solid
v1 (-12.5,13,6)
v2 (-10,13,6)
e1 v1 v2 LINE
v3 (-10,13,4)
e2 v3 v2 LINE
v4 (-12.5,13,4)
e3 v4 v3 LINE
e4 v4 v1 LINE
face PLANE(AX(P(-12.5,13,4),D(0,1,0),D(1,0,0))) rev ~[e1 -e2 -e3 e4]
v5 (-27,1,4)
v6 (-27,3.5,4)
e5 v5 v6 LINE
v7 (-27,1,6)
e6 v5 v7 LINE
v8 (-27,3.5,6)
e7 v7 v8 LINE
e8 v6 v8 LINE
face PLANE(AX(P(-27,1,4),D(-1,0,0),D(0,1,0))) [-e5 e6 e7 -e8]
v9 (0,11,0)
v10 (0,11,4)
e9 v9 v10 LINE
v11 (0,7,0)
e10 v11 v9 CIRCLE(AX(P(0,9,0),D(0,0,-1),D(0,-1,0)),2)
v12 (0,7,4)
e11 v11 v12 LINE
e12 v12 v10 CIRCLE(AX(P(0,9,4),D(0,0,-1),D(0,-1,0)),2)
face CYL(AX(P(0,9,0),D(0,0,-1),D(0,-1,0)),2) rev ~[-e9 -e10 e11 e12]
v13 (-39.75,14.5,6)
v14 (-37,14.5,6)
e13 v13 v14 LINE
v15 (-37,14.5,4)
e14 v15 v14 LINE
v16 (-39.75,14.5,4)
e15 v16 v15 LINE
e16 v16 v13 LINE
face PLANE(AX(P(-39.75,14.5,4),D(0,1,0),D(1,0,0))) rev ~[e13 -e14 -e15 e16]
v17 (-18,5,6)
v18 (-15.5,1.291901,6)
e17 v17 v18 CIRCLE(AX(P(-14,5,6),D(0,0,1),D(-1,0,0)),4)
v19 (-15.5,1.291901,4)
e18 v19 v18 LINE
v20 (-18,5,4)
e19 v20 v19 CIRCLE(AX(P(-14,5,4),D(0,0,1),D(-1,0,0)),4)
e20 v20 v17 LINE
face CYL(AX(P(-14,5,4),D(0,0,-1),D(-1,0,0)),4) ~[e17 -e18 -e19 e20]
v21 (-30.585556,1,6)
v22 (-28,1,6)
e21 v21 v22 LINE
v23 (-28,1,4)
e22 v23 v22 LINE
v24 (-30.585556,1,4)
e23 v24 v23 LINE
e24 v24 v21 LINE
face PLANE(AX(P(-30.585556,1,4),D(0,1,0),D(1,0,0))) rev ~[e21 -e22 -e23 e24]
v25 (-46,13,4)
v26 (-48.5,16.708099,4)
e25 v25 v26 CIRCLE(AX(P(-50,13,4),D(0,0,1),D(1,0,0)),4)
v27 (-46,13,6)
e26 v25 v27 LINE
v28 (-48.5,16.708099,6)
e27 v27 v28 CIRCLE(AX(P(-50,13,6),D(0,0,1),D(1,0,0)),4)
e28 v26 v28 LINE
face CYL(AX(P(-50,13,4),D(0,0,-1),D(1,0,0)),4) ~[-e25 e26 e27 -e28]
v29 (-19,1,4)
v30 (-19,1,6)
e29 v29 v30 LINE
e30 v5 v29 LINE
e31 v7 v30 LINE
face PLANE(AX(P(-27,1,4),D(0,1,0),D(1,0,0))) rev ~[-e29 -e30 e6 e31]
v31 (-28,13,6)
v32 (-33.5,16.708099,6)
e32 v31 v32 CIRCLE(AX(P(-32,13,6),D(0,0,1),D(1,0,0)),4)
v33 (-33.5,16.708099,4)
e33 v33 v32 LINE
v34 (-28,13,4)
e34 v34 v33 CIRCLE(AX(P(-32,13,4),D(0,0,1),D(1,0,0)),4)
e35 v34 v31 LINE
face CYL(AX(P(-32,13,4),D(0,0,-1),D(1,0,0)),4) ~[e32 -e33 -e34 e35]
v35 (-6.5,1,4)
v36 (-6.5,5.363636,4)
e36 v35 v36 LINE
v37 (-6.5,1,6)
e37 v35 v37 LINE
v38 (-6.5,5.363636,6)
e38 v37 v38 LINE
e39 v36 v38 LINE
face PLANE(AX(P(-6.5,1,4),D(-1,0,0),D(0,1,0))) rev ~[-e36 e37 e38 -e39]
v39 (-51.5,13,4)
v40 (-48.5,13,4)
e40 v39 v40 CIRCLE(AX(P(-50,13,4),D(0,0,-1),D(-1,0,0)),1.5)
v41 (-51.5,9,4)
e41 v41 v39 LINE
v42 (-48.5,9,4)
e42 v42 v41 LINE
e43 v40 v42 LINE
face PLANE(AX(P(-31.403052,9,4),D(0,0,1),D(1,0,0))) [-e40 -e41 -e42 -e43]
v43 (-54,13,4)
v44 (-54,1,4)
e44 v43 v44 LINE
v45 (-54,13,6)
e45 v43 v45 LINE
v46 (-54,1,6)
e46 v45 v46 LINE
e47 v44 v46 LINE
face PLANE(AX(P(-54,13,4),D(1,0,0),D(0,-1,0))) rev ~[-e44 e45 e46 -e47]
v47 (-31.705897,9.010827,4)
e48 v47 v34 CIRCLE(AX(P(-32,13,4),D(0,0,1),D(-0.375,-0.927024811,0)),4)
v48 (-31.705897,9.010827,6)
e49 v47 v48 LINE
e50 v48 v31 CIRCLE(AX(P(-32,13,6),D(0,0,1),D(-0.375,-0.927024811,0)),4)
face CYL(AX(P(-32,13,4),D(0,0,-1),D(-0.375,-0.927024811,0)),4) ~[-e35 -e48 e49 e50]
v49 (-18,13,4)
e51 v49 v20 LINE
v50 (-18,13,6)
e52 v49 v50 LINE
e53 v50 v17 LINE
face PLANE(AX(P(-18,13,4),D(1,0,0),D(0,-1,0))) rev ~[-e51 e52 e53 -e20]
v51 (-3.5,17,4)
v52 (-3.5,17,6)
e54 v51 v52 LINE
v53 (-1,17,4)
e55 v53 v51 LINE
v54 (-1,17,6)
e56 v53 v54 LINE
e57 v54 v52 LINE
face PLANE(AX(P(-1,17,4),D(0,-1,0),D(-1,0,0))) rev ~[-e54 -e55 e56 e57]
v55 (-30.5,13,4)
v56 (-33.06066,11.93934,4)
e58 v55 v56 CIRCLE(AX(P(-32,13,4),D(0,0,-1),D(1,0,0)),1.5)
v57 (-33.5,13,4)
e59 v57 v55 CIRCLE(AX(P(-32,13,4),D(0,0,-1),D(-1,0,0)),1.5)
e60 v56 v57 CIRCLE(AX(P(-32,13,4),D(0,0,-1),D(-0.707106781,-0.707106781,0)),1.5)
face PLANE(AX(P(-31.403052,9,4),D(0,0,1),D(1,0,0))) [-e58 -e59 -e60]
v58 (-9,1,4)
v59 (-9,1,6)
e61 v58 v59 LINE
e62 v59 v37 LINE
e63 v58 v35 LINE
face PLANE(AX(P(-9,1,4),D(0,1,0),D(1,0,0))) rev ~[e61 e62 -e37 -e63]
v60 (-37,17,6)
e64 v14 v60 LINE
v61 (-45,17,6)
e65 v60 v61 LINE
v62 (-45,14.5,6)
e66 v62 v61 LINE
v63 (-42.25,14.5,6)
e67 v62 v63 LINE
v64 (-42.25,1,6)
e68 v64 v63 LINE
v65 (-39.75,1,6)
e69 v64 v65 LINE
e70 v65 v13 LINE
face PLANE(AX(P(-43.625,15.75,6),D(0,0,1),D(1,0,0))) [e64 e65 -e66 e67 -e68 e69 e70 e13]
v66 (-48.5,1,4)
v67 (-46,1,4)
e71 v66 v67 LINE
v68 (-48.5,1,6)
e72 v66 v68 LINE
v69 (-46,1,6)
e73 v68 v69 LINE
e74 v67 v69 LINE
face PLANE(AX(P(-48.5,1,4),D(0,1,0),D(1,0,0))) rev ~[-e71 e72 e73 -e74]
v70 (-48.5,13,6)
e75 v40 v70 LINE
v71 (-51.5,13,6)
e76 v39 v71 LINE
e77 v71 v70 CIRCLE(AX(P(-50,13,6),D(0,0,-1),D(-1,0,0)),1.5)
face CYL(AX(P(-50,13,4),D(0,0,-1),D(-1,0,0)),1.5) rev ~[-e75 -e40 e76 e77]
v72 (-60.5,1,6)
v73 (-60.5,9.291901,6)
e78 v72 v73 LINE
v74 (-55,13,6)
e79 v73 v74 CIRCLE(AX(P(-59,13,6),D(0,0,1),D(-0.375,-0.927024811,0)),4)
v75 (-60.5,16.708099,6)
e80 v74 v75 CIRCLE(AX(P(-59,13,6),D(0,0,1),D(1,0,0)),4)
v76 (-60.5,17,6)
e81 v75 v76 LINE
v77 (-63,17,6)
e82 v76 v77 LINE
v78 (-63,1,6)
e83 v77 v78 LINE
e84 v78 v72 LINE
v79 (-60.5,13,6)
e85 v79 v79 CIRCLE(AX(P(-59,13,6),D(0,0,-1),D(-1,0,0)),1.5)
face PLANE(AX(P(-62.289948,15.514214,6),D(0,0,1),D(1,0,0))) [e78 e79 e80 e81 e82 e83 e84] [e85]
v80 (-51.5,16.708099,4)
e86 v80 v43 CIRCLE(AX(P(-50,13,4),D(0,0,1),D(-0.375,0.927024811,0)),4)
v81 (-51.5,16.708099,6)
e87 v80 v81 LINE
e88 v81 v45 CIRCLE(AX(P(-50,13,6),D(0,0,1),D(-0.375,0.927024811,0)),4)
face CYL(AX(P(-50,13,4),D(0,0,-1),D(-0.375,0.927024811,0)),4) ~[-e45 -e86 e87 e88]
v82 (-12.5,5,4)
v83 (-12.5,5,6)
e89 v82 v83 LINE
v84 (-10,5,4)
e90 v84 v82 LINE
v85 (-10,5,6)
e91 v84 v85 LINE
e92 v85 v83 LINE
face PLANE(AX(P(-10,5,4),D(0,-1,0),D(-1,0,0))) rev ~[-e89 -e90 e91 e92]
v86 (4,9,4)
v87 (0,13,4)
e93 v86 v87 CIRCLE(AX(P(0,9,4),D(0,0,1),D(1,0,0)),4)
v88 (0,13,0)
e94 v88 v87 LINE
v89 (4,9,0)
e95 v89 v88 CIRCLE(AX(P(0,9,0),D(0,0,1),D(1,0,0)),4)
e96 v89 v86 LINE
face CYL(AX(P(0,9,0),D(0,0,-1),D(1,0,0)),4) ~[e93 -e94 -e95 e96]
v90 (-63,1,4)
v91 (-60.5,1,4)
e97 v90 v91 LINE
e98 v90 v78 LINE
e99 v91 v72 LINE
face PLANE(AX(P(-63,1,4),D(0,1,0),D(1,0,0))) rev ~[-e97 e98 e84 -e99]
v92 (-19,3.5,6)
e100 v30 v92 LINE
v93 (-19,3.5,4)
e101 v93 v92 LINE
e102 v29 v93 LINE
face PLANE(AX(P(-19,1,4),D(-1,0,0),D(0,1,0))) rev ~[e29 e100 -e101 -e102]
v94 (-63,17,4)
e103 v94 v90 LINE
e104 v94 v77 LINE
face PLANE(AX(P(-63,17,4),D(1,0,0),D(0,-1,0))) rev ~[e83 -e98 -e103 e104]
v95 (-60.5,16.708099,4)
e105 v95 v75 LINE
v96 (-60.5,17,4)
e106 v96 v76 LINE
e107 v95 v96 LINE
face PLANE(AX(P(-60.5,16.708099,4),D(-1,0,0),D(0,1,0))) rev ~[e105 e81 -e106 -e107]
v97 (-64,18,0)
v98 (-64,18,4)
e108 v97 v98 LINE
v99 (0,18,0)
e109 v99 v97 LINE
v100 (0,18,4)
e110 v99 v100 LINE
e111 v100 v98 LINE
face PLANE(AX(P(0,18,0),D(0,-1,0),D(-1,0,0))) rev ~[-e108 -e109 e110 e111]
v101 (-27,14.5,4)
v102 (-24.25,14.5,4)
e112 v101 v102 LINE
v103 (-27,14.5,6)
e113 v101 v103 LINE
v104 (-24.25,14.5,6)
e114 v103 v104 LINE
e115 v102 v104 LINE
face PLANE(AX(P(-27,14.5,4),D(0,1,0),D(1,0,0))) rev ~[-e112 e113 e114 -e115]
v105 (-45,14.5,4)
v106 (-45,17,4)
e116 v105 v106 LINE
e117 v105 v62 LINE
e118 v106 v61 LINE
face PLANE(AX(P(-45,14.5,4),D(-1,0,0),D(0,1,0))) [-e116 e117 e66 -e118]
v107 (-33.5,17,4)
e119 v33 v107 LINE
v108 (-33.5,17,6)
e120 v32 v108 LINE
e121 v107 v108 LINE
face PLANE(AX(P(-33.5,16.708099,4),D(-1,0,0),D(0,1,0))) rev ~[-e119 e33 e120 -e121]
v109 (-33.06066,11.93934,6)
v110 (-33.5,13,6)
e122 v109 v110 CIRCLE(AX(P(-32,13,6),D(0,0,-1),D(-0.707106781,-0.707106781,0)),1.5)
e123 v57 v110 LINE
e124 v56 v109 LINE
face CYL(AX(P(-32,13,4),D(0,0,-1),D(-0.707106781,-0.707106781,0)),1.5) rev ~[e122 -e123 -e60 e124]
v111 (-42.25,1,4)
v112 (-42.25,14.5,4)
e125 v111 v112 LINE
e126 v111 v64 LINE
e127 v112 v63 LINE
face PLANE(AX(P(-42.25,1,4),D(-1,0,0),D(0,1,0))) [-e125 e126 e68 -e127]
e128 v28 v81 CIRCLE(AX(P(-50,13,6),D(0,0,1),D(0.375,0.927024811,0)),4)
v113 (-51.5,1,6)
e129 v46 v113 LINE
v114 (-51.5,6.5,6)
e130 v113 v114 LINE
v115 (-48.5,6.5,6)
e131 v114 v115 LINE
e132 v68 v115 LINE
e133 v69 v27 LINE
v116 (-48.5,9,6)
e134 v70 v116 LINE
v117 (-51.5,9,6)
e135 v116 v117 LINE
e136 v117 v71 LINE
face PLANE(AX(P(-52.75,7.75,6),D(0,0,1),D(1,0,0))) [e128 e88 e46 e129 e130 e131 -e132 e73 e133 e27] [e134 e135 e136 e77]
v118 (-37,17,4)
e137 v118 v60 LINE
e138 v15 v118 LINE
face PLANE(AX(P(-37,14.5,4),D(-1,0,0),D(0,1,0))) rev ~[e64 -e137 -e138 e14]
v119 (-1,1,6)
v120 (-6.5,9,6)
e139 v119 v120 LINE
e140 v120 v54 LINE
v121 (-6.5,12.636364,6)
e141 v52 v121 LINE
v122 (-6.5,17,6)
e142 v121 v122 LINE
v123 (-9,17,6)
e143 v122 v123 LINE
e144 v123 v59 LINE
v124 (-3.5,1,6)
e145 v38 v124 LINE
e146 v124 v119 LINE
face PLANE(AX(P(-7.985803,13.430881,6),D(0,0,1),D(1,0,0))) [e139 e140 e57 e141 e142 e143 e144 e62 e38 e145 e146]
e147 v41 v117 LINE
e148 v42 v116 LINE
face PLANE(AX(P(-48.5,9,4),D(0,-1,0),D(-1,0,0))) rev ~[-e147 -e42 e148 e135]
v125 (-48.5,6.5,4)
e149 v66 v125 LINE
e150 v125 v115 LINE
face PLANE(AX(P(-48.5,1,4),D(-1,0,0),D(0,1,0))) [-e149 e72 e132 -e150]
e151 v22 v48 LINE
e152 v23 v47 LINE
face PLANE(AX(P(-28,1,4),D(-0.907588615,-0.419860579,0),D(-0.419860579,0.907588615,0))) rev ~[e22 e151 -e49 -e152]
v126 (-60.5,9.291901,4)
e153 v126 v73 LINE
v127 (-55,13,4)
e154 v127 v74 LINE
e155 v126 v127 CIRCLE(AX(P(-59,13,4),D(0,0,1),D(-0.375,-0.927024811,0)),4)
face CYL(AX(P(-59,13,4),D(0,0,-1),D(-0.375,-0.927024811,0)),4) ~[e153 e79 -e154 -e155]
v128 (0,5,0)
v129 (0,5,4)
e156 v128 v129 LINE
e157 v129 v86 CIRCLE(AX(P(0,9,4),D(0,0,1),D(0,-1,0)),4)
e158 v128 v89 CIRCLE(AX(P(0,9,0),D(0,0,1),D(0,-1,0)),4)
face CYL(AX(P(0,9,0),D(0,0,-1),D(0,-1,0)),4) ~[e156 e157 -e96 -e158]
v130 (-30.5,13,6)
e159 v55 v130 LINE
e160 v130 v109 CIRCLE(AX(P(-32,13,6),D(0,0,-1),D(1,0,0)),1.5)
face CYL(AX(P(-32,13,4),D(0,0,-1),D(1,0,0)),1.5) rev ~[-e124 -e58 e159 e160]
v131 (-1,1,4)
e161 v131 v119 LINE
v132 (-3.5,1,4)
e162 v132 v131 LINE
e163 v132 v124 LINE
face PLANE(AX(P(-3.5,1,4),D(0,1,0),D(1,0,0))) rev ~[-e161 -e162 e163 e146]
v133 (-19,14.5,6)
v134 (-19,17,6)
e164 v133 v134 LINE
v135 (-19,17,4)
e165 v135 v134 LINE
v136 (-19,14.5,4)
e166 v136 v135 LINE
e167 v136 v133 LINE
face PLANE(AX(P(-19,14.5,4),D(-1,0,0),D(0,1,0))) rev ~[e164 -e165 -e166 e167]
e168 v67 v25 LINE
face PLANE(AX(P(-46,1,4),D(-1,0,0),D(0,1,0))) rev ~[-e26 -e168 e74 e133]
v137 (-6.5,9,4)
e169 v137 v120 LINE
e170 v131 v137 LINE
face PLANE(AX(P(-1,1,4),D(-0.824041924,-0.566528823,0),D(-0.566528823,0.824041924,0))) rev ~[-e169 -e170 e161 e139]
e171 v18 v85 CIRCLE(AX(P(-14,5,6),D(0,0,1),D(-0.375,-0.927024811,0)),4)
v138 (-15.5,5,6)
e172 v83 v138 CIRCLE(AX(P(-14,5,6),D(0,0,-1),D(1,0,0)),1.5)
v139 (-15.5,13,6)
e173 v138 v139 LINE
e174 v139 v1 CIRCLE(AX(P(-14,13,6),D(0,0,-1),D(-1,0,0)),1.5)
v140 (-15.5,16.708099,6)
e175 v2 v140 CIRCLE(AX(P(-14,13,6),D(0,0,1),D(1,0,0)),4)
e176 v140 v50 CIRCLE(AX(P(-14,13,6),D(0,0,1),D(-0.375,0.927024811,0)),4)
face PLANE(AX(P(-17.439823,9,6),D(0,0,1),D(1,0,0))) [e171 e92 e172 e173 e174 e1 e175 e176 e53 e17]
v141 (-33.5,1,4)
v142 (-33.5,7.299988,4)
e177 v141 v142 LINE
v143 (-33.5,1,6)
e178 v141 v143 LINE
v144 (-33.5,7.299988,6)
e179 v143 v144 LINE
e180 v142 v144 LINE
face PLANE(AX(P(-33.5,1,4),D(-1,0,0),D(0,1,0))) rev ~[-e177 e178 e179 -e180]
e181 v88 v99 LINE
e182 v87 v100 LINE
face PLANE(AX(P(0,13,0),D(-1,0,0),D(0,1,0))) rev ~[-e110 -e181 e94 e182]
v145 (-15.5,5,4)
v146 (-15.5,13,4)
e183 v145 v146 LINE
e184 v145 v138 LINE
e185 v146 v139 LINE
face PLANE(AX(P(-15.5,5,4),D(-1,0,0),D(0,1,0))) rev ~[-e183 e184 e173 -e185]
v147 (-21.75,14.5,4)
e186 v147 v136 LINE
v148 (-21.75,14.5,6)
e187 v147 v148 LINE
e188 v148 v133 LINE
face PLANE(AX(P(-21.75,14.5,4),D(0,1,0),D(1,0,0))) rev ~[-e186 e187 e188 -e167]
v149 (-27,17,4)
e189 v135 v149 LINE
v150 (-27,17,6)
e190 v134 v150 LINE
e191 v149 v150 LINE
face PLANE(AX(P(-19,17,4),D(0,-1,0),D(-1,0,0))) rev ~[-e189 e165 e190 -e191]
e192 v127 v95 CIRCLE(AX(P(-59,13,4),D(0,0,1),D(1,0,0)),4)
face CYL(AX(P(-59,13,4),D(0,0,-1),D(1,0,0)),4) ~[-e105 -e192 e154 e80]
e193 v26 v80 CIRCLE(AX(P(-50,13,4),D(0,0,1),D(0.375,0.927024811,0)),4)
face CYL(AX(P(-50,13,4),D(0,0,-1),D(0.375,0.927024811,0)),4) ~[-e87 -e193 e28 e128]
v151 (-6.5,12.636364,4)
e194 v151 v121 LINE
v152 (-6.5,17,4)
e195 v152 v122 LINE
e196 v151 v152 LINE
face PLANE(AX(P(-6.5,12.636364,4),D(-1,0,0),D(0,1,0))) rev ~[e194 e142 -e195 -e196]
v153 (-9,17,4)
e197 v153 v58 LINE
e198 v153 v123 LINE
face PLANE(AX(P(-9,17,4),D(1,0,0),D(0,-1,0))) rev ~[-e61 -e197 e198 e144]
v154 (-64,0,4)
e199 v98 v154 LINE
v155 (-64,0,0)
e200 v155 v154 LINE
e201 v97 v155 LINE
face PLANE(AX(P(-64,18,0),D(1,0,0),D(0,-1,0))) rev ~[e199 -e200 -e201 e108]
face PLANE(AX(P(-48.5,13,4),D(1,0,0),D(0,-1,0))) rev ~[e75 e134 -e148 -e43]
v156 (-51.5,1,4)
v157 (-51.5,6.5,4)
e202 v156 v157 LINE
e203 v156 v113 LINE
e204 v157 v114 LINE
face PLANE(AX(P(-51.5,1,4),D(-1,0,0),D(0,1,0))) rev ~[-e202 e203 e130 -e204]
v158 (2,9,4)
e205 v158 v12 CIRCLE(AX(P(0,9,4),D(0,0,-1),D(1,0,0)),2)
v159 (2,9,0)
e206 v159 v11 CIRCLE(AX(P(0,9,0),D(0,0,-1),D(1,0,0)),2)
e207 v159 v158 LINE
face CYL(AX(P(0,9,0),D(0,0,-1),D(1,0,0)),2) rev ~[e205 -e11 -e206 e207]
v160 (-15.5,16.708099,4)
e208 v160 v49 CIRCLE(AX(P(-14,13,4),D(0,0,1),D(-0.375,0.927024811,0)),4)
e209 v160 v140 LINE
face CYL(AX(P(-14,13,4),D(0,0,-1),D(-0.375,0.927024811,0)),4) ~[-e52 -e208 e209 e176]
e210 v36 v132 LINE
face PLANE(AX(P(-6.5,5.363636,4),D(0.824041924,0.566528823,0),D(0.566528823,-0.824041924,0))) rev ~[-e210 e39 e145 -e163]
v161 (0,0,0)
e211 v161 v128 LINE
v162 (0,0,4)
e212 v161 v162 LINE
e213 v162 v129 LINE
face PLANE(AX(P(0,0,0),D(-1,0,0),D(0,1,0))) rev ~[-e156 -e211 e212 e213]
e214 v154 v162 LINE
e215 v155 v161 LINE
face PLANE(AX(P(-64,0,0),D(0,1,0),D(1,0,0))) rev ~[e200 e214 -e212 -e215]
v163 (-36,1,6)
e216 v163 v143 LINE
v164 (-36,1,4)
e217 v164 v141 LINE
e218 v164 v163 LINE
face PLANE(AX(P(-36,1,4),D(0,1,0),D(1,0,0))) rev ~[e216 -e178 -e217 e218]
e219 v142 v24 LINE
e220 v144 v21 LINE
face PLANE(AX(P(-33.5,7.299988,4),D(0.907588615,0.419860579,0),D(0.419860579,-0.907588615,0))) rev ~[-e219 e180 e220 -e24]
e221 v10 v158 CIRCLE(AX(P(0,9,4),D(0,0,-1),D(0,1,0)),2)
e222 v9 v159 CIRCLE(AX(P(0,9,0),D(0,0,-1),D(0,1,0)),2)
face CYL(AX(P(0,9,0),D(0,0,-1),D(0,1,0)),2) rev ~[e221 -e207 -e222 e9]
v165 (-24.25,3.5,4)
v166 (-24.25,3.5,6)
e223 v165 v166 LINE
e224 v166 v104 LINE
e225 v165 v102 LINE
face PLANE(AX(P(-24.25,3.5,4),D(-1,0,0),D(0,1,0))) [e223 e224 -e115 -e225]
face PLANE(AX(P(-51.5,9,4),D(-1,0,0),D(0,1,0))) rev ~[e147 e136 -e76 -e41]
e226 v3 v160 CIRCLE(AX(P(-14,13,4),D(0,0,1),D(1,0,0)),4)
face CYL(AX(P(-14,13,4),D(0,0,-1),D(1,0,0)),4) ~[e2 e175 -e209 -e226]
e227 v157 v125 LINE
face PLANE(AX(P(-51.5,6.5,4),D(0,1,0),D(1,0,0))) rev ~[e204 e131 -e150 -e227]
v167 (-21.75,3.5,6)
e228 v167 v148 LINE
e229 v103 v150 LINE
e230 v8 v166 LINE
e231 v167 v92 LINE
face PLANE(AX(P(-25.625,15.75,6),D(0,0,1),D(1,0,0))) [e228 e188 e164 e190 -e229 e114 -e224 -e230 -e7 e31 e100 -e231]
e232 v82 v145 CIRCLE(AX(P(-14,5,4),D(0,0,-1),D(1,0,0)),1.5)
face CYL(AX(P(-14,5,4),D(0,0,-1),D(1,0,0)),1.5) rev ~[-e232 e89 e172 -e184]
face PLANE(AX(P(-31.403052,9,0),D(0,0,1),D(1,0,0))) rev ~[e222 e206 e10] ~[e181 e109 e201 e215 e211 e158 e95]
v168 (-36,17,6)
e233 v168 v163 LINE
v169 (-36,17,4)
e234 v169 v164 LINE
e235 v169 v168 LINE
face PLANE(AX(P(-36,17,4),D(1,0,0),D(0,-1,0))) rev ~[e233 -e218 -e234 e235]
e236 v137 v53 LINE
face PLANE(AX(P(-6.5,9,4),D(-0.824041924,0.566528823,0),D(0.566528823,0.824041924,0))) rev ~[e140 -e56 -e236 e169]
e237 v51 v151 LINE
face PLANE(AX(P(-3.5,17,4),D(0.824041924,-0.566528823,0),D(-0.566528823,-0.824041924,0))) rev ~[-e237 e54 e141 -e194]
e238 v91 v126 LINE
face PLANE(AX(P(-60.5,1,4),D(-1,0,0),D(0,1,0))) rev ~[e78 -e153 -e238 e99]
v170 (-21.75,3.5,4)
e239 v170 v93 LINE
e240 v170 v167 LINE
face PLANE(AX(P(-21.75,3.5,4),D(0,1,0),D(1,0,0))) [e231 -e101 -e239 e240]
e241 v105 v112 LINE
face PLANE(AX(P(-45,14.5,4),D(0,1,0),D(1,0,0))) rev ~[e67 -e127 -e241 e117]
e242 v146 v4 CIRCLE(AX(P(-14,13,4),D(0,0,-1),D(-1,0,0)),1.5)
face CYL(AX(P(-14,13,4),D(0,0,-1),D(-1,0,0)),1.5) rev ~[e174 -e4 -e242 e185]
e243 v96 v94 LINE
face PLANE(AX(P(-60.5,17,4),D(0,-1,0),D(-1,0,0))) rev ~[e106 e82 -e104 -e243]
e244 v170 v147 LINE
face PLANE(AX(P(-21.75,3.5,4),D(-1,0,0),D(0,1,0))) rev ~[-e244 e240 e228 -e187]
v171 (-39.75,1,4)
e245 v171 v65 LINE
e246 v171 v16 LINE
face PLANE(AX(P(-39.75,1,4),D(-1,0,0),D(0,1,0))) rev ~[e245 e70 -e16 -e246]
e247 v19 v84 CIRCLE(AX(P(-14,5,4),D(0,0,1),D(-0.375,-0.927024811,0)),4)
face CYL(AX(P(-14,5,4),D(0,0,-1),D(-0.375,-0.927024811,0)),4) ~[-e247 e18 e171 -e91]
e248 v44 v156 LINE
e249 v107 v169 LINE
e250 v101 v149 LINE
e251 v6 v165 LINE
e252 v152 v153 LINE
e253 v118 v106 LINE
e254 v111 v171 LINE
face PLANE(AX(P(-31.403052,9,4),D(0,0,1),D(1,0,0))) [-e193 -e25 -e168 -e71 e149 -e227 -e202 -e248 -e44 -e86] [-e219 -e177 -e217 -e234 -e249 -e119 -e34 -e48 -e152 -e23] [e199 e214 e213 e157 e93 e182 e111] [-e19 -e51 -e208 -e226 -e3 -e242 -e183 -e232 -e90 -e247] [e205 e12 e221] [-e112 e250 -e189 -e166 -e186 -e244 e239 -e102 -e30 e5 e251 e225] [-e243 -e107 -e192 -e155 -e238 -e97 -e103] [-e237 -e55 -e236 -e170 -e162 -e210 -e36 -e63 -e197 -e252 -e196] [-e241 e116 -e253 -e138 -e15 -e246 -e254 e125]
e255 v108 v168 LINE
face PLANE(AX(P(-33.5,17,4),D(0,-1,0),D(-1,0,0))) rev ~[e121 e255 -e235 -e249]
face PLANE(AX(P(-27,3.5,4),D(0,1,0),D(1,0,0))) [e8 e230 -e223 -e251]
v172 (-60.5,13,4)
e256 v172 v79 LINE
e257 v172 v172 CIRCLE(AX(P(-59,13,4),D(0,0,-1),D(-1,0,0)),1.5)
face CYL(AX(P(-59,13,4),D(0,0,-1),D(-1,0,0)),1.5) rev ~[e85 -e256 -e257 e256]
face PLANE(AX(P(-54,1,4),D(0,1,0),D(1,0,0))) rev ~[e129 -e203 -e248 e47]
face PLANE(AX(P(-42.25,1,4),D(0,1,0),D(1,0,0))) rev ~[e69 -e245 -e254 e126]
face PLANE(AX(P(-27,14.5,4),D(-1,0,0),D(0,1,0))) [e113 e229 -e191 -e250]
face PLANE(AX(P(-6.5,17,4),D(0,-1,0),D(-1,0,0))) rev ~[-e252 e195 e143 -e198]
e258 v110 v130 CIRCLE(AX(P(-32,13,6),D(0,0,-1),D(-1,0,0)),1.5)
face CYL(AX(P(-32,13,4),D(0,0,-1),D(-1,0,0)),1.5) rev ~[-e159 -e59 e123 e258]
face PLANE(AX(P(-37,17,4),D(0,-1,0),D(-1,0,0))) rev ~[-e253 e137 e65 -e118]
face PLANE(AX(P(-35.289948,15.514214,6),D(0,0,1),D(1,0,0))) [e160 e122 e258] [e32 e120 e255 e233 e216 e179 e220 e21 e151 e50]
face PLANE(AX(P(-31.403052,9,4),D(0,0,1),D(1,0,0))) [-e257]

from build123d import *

# Parameters (mm, degrees)
F1_DEPTH = 4
F2_W     = 2.5
F2_H     = 2.5
F2_H_2   = 5.5
F2_W_2   = 2.75
F2_H_3   = 13.5
F2_H_4   = 11
F3_DEPTH = 2


with BuildPart() as f1:
    # F0 (on Top) → F1 (new body)
    with BuildSketch(Plane.XY):
        with BuildLine():
            Line((-64, 0), (0, 0))
            Line((0, 0), (0, 5))
            ThreePointArc((0, 5), (-4, 9), (0, 13))
            Line((0, 13), (0, 18))
            Line((0, 18), (-64, 18))
            Line((-64, 18), (-64, 0))
        make_face()
        with BuildLine():
            ThreePointArc((0, 13), (-4, 9), (0, 5))
            Line((0, 5), (0, 7))
            ThreePointArc((0, 7), (-2, 9), (0, 11))
            Line((0, 11), (0, 13))
        make_face()
        with BuildLine():
            Line((0, 7), (0, 5))
            ThreePointArc((0, 5), (2.8284271247, 6.1715728753), (4, 9))
            ThreePointArc((4, 9), (2.8284271247, 11.8284271247), (0, 13))
            Line((0, 13), (0, 11))
            ThreePointArc((0, 11), (1.4142135624, 10.4142135624), (2, 9))
            ThreePointArc((2, 9), (1.4142135624, 7.5857864376), (0, 7))
        make_face()
    extrude(amount=F1_DEPTH)

    # F2 (on face) → F3 (join)
    with BuildSketch(Plane.XY.offset(4)):
        with BuildLine():
            Line((-60.5, 17), (-63, 17))
            Line((-63, 17), (-63, 13))
            ThreePointArc((-63, 13), (-62.3166247904, 15.2360679775), (-60.5, 16.7080992435))
            Line((-60.5, 16.7080992435), (-60.5, 17))
        make_face()
        with BuildLine():
            ThreePointArc((-60.5, 9.2919007565), (-62.3166247904, 10.7639320225), (-63, 13))
            Line((-63, 13), (-63, 1))
            Line((-63, 1), (-60.5, 1))
            Line((-60.5, 1), (-60.5, 9.2919007565))
        make_face()
        with BuildLine():
            ThreePointArc((-60.5, 16.7080992435), (-62.3166247904, 15.2360679775), (-63, 13))
            ThreePointArc((-63, 13), (-62.3166247904, 10.7639320225), (-60.5, 9.2919007565))
            Line((-60.5, 9.2919007565), (-60.5, 13))
            Line((-60.5, 13), (-60.5, 16.7080992435))
        make_face()
        with BuildLine():
            ThreePointArc((-55, 13), (-56.7639320225, 16.3166247904), (-60.5, 16.7080992435))
            Line((-60.5, 16.7080992435), (-60.5, 13))
            Line((-60.5, 13), (-60.5, 9.2919007565))
            ThreePointArc((-60.5, 9.2919007565), (-56.7639320225, 9.6833752096), (-55, 13))
        make_face()
        with BuildLine():
            ThreePointArc((-57.5, 13), (-59, 11.5), (-60.5, 13))
            ThreePointArc((-60.5, 13), (-59, 14.5), (-57.5, 13))
        make_face(mode=Mode.SUBTRACT)
        with Locations((-52.75, 7.75)):
            Rectangle(F2_W, F2_H)
        with BuildLine():
            Line((-54, 13), (-54, 9))
            Line((-54, 9), (-51.5, 9))
            Line((-51.5, 9), (-51.5, 9.2919007565))
            ThreePointArc((-51.5, 9.2919007565), (-53.3166247904, 10.7639320225), (-54, 13))
        make_face()
        with Locations((-52.75, 3.75)):
            Rectangle(F2_W, F2_H_2)
        with BuildLine():
            ThreePointArc((-51.5, 16.7080992435), (-53.3166247904, 15.2360679775), (-54, 13))
            ThreePointArc((-54, 13), (-53.3166247904, 10.7639320225), (-51.5, 9.2919007565))
            Line((-51.5, 9.2919007565), (-51.5, 13))
            Line((-51.5, 13), (-51.5, 16.7080992435))
        make_face()
        Polygon((-50, 9), (-51.5, 9), (-51.5, 6.5), (-48.5, 6.5), (-48.5, 9), align=None)
        with BuildLine():
            ThreePointArc((-48.5, 16.7080992435), (-50, 17), (-51.5, 16.7080992435))
            Line((-51.5, 16.7080992435), (-51.5, 13))
            ThreePointArc((-51.5, 13), (-50, 14.5), (-48.5, 13))
            Line((-48.5, 13), (-48.5, 16.7080992435))
        make_face()
        with Locations((-47.25, 3.75)):
            Rectangle(F2_W, F2_H_2)
        with Locations((-47.25, 7.75)):
            Rectangle(F2_W, F2_H)
        with BuildLine():
            ThreePointArc((-46, 13), (-46.6833752096, 15.2360679775), (-48.5, 16.7080992435))
            Line((-48.5, 16.7080992435), (-48.5, 13))
            Line((-48.5, 13), (-48.5, 9.2919007565))
            ThreePointArc((-48.5, 9.2919007565), (-46.6833752096, 10.7639320225), (-46, 13))
        make_face()
        with BuildLine():
            Line((-48.5, 9.2919007565), (-48.5, 9))
            Line((-48.5, 9), (-46, 9))
            Line((-46, 9), (-46, 13))
            ThreePointArc((-46, 13), (-46.6833752096, 10.7639320225), (-48.5, 9.2919007565))
        make_face()
        with Locations((-43.625, 15.75)):
            Rectangle(F2_W_2, F2_H)
        with Locations((-41, 15.75)):
            Rectangle(F2_W, F2_H)
        with Locations((-38.375, 15.75)):
            Rectangle(F2_W_2, F2_H)
        with Locations((-41, 7.75)):
            Rectangle(F2_W, F2_H_3)
        with BuildLine():
            Line((-33.5, 17), (-36, 17))
            Line((-36, 17), (-36, 13))
            ThreePointArc((-36, 13), (-35.3166247904, 15.2360679775), (-33.5, 16.7080992435))
            Line((-33.5, 16.7080992435), (-33.5, 17))
        make_face()
        with BuildLine():
            ThreePointArc((-34.8284271247, 10.1715728753), (-35.69551813, 11.4692662705), (-36, 13))
            Line((-36, 13), (-36, 1))
            Line((-36, 1), (-33.5, 1))
            Line((-33.5, 1), (-33.5, 7.299987892))
            Line((-33.5, 7.299987892), (-34.8284271247, 10.1715728753))
        make_face()
        with BuildLine():
            ThreePointArc((-33.5, 16.7080992435), (-35.3166247904, 15.2360679775), (-36, 13))
            ThreePointArc((-36, 13), (-35.69551813, 11.4692662705), (-34.8284271247, 10.1715728753))
            ThreePointArc((-34.8284271247, 10.1715728753), (-34.2084555922, 9.6649252036), (-33.5, 9.2919007565))
            Line((-33.5, 9.2919007565), (-33.5, 13))
            Line((-33.5, 13), (-33.5, 16.7080992435))
        make_face()
        with BuildLine():
            ThreePointArc((-28, 13), (-29.7639320225, 16.3166247904), (-33.5, 16.7080992435))
            Line((-33.5, 16.7080992435), (-33.5, 13))
            ThreePointArc((-33.5, 13), (-32, 14.5), (-30.5, 13))
            ThreePointArc((-30.5, 13), (-31.4259748515, 11.6141807012), (-33.0606601718, 11.9393398282))
            Line((-33.0606601718, 11.9393398282), (-31.7058974503, 9.0108266909))
            ThreePointArc((-31.7058974503, 9.0108266909), (-29.0694360441, 10.2775388156), (-28, 13))
        make_face()
        with BuildLine():
            ThreePointArc((-33.5, 9.2919007565), (-34.2084555922, 9.6649252036), (-34.8284271247, 10.1715728753))
            Line((-34.8284271247, 10.1715728753), (-33.5, 7.299987892))
            Line((-33.5, 7.299987892), (-33.5, 9.2919007565))
        make_face()
        with BuildLine():
            ThreePointArc((-33.0606601718, 11.9393398282), (-33.3858192988, 12.4259748515), (-33.5, 13))
            Line((-33.5, 13), (-33.5, 9.2919007565))
            ThreePointArc((-33.5, 9.2919007565), (-32.6191105093, 9.048202665), (-31.7058974503, 9.0108266909))
            Line((-31.7058974503, 9.0108266909), (-33.0606601718, 11.9393398282))
        make_face()
        with BuildLine():
            ThreePointArc((-31.7058974503, 9.0108266909), (-32.6191105093, 9.048202665), (-33.5, 9.2919007565))
            Line((-33.5, 9.2919007565), (-33.5, 7.299987892))
            Line((-33.5, 7.299987892), (-30.5855555903, 1))
            Line((-30.5855555903, 1), (-28, 1))
            Line((-28, 1), (-31.7058974503, 9.0108266909))
        make_face()
        with Locations((-25.625, 15.75)):
            Rectangle(F2_W_2, F2_H)
        with Locations((-23, 15.75)):
            Rectangle(F2_W, F2_H)
        with Locations((-20.375, 15.75)):
            Rectangle(F2_W_2, F2_H)
        with Locations((-23, 9)):
            Rectangle(F2_W, F2_H_4)
        with Locations((-25.625, 2.25)):
            Rectangle(F2_W_2, F2_H)
        with Locations((-23, 2.25)):
            Rectangle(F2_W, F2_H)
        with Locations((-20.375, 2.25)):
            Rectangle(F2_W_2, F2_H)
        with BuildLine():
            ThreePointArc((-15.5, 9.2919007565), (-17.3166247904, 10.7639320225), (-18, 13))
            Line((-18, 13), (-18, 5))
            ThreePointArc((-18, 5), (-17.3166247904, 7.2360679775), (-15.5, 8.7080992435))
            Line((-15.5, 8.7080992435), (-15.5, 9.2919007565))
        make_face()
        with BuildLine():
            ThreePointArc((-15.5, 16.7080992435), (-17.3166247904, 15.2360679775), (-18, 13))
            ThreePointArc((-18, 13), (-17.3166247904, 10.7639320225), (-15.5, 9.2919007565))
            Line((-15.5, 9.2919007565), (-15.5, 13))
            Line((-15.5, 13), (-15.5, 16.7080992435))
        make_face()
        with BuildLine():
            ThreePointArc((-15.5, 8.7080992435), (-17.3166247904, 7.2360679775), (-18, 5))
            ThreePointArc((-18, 5), (-17.3166247904, 2.7639320225), (-15.5, 1.2919007565))
            Line((-15.5, 1.2919007565), (-15.5, 5))
            Line((-15.5, 5), (-15.5, 8.7080992435))
        make_face()
        with BuildLine():
            ThreePointArc((-10, 13), (-11.7639320225, 16.3166247904), (-15.5, 16.7080992435))
            Line((-15.5, 16.7080992435), (-15.5, 13))
            ThreePointArc((-15.5, 13), (-14, 14.5), (-12.5, 13))
            Line((-12.5, 13), (-10, 13))
        make_face()
        with BuildLine():
            Line((-15.5, 5), (-15.5, 1.2919007565))
            ThreePointArc((-15.5, 1.2919007565), (-11.7639320225, 1.6833752096), (-10, 5))
            Line((-10, 5), (-12.5, 5))
            ThreePointArc((-12.5, 5), (-14, 3.5), (-15.5, 5))
        make_face()
        Polygon((-6.5, 17), (-9, 17), (-9, 9), (-6.5, 12.6363636364), align=None)
        Polygon((-6.5, 5.3636363636), (-9, 9), (-9, 1), (-6.5, 1), align=None)
        Polygon((-6.5, 12.6363636364), (-9, 9), (-6.5, 5.3636363636), (-6.5, 9), align=None)
        Polygon((-3.5, 17), (-6.5, 12.6363636364), (-6.5, 9), (-1, 17), align=None)
        Polygon((-6.5, 9), (-6.5, 5.3636363636), (-3.5, 1), (-1, 1), align=None)
    extrude(amount=F3_DEPTH)


solid = f1.part
